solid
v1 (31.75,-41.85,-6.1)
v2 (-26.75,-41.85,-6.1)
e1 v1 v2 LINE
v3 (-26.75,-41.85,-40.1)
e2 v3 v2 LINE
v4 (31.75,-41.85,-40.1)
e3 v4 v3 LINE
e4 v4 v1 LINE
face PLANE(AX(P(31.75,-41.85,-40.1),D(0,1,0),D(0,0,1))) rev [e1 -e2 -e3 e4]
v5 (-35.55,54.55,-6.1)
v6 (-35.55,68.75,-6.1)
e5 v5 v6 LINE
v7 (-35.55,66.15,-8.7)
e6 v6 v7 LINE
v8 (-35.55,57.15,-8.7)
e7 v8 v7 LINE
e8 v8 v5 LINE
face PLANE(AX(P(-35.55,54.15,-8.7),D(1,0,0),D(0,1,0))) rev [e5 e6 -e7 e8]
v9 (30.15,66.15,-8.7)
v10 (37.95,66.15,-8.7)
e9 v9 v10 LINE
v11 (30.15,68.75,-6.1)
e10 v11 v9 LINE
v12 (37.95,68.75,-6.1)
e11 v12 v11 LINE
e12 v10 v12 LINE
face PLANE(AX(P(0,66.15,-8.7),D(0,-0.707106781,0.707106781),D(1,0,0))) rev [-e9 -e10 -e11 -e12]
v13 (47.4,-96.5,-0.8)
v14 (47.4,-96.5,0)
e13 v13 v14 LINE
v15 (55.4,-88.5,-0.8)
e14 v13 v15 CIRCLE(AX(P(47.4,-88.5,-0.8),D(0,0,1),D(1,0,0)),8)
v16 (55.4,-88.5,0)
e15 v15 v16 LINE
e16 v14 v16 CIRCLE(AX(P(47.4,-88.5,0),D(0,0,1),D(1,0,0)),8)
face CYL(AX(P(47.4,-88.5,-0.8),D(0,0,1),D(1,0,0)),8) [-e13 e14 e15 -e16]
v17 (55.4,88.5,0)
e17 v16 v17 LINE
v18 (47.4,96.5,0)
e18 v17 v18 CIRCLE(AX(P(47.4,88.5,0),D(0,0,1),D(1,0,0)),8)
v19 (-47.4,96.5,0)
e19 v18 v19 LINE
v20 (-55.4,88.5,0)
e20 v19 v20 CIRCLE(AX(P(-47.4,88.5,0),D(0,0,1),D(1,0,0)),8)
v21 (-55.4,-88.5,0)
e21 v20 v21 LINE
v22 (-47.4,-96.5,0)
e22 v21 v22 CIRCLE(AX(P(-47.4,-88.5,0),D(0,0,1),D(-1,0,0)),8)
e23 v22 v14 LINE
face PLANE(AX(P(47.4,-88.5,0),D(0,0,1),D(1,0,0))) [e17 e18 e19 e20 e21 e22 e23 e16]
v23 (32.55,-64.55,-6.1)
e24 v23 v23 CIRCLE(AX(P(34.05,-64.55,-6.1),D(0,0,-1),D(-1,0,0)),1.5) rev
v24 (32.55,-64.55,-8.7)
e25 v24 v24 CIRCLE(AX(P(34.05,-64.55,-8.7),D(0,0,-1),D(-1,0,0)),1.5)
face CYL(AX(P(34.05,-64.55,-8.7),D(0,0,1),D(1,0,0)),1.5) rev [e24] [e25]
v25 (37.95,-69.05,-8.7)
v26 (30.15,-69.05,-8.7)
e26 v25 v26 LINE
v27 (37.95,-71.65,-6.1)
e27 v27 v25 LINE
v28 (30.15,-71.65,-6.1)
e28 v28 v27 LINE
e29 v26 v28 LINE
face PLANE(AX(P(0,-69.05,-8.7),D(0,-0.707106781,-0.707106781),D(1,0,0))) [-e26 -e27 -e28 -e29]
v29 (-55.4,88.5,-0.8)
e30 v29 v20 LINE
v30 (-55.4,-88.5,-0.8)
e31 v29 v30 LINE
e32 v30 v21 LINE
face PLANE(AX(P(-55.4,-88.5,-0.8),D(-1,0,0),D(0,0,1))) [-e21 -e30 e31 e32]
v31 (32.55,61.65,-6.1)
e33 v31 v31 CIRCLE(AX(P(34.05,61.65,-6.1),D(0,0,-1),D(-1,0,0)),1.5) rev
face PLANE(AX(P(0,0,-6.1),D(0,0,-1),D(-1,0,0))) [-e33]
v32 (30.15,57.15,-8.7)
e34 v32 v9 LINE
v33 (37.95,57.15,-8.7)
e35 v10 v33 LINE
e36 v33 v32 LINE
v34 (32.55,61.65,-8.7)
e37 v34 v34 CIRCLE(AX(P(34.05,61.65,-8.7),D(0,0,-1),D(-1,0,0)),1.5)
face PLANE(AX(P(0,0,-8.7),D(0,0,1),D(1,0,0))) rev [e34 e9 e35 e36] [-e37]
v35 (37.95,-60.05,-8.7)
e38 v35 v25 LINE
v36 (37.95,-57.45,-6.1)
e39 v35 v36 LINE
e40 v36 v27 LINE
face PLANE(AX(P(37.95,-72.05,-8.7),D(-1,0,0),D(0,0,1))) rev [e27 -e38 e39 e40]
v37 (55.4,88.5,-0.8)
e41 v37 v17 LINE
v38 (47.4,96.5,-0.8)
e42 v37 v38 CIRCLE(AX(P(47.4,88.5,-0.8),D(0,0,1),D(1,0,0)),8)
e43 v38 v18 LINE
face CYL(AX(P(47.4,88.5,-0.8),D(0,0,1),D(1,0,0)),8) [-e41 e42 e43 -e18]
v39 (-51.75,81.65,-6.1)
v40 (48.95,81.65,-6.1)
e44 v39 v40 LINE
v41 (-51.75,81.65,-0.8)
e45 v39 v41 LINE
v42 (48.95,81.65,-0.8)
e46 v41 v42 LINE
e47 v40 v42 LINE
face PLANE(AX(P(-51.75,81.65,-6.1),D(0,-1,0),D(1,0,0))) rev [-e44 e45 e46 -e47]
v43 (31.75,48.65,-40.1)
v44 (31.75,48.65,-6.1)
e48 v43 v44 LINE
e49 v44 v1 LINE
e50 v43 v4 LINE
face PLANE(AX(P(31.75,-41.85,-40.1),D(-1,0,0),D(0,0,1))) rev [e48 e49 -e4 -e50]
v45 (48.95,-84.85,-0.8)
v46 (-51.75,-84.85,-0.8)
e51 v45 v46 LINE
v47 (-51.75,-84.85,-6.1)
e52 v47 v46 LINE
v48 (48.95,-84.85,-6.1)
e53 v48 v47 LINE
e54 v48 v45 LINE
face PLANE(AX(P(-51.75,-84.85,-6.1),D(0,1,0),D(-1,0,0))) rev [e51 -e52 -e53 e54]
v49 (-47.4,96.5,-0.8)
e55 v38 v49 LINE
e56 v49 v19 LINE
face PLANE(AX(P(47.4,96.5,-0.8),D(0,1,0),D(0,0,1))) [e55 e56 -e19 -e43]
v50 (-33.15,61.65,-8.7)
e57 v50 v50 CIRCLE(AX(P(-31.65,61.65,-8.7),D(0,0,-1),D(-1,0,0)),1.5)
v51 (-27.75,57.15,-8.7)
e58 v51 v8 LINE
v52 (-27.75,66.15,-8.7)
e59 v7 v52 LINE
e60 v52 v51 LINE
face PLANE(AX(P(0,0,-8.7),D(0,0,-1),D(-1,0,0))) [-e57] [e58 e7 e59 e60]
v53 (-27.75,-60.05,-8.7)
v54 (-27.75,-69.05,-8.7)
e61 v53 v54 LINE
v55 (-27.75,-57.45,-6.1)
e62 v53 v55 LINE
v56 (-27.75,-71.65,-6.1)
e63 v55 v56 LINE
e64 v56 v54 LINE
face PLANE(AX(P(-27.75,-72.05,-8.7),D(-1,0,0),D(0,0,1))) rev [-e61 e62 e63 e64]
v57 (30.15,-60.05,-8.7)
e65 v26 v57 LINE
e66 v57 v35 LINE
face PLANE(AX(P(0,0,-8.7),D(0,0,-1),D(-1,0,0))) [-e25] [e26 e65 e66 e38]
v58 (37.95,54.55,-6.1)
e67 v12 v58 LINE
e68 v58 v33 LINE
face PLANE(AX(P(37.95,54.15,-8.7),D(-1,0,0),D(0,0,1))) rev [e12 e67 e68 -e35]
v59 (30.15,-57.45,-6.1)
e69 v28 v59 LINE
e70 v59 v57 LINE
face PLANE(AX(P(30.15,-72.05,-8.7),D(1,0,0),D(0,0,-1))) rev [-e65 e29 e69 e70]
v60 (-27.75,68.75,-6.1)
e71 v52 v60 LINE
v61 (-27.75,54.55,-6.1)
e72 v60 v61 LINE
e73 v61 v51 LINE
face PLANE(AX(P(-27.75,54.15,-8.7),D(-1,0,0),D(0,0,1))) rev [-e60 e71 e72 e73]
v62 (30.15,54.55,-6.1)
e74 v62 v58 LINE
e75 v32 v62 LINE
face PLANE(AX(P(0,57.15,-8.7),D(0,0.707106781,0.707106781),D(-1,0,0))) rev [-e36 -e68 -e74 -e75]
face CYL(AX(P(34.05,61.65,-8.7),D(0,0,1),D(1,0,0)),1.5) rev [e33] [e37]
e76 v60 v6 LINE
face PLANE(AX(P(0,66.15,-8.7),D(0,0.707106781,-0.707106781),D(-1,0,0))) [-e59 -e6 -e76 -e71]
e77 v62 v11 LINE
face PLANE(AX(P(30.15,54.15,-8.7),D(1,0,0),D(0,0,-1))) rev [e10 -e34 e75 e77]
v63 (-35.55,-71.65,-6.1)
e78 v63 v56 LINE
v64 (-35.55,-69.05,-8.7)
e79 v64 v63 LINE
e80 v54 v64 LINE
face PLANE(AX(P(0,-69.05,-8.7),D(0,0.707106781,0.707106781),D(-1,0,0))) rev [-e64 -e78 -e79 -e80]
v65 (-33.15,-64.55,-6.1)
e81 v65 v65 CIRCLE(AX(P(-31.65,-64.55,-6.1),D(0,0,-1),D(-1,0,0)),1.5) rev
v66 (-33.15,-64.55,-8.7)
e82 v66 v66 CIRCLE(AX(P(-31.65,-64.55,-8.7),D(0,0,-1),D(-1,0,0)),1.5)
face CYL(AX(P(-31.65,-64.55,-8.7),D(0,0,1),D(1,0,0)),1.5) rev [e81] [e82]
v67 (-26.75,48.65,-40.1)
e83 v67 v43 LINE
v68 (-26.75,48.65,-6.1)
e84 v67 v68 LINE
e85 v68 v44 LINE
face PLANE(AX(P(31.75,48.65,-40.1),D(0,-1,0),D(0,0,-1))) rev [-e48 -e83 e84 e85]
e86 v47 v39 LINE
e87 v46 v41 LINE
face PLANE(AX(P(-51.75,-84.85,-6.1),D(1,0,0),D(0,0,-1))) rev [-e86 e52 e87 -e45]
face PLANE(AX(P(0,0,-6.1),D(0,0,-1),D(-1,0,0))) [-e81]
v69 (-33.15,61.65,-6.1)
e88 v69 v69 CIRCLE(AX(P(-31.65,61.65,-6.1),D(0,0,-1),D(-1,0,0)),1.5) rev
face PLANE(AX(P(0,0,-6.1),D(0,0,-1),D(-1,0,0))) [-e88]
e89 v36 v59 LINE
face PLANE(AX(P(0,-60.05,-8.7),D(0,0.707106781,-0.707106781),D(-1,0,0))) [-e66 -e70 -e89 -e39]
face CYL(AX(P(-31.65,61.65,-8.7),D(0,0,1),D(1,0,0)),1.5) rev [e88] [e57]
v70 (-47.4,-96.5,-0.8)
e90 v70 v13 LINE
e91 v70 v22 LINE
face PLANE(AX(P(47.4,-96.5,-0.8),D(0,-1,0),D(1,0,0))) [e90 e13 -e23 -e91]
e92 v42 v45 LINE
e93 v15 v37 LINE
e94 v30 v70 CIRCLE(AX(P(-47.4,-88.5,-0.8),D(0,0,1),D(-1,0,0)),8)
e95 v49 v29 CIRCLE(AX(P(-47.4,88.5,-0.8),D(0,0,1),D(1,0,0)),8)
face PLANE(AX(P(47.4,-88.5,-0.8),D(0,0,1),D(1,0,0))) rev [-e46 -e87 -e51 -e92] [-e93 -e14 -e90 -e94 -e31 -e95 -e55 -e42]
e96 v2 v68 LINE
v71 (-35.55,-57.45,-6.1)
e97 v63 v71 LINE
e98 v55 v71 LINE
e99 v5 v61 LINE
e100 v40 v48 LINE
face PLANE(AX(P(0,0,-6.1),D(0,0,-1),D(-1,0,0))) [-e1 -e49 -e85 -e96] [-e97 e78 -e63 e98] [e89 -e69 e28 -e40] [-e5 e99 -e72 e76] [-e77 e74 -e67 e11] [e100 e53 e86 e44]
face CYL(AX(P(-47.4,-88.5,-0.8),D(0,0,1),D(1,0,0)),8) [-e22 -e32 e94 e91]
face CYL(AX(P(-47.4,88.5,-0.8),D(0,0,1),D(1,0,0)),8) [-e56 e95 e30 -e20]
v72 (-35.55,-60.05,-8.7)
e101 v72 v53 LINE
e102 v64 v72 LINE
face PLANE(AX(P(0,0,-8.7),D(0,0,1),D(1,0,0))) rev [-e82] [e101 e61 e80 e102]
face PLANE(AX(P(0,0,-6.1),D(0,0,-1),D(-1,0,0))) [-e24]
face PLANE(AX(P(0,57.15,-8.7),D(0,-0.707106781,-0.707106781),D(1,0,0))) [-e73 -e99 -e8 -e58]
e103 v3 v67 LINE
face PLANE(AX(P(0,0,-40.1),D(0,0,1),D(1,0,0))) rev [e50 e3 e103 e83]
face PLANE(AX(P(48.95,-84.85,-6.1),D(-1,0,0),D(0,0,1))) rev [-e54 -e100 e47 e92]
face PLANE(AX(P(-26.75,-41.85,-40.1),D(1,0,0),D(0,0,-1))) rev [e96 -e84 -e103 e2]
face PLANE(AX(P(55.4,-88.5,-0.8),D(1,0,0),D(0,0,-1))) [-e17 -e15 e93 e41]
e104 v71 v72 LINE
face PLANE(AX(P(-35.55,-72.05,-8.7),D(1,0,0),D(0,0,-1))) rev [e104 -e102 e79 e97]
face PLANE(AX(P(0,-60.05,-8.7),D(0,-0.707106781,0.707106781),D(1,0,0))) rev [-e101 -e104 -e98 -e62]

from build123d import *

# Parameters (mm, degrees)
BOSS_EXTRUDE1_DEPTH = 0.8
SKETCH2_W           = 100.7
SKETCH2_H           = 166.5
BOSS_EXTRUDE2_DEPTH = 5.3
SKETCH3_W           = 7.8
SKETCH3_H           = 15
SKETCH3_R           = 1.5
BOSS_EXTRUDE3_DEPTH = 2.6
SKETCH4_W           = 58.5
SKETCH4_H           = 90.5
BOSS_EXTRUDE4_DEPTH = 34
CHAMFER1_SIZE       = 3


with BuildPart() as part:
    # Sketch1 → Boss-Extrude1 (new body)
    with BuildSketch(Plane.XY):
        with BuildLine():
            Line((47.4, -96.5), (-47.4, -96.5))
            ThreePointArc((-47.4, -96.5), (-53.056854249, -94.156854249), (-55.4, -88.5))
            Line((-55.4, -88.5), (-55.4, 88.5))
            ThreePointArc((-55.4, 88.5), (-53.056854249, 94.156854249), (-47.4, 96.5))
            Line((-47.4, 96.5), (47.4, 96.5))
            ThreePointArc((47.4, 96.5), (53.056854249, 94.156854249), (55.4, 88.5))
            Line((55.4, 88.5), (55.4, -88.5))
            ThreePointArc((55.4, -88.5), (53.056854249, -94.156854249), (47.4, -96.5))
        make_face()
    extrude(amount=-BOSS_EXTRUDE1_DEPTH)

    # Sketch2 → Boss-Extrude2 (add)
    with BuildSketch(Plane(origin=(0, 0, -0.8), x_dir=(-1, 0, 0), z_dir=(0, 0, -1))):
        with Locations((1.4, -1.6)):
            Rectangle(SKETCH2_W, SKETCH2_H)
    extrude(amount=BOSS_EXTRUDE2_DEPTH)

    # Sketch3 → Boss-Extrude3 (add)
    # profile 1 of 4: a face of its own
    with BuildSketch(Plane(origin=(0, 0, -6.1), x_dir=(-1, 0, 0), z_dir=(0, 0, -1))):
        with Locations((-34.05, 61.65)):
            Rectangle(SKETCH3_W, SKETCH3_H)
        with Locations((-34.05, 61.65)):
            Circle(SKETCH3_R, mode=Mode.SUBTRACT)
    # profile 2 of 4: a face of its own
    with BuildSketch(Plane(origin=(0, 0, -6.1), x_dir=(-1, 0, 0), z_dir=(0, 0, -1))):
        with Locations((31.65, 61.65)):
            Rectangle(SKETCH3_W, SKETCH3_H)
        with Locations((31.65, 61.65)):
            Circle(SKETCH3_R, mode=Mode.SUBTRACT)
    # profile 3 of 4: a face of its own
    with BuildSketch(Plane(origin=(0, 0, -6.1), x_dir=(-1, 0, 0), z_dir=(0, 0, -1))):
        with Locations((-34.05, -64.55)):
            Rectangle(SKETCH3_W, SKETCH3_H)
        with Locations((-34.05, -64.55)):
            Circle(SKETCH3_R, mode=Mode.SUBTRACT)
    # profile 4 of 4: a face of its own
    with BuildSketch(Plane(origin=(0, 0, -6.1), x_dir=(-1, 0, 0), z_dir=(0, 0, -1))):
        with Locations((31.65, -64.55)):
            Rectangle(SKETCH3_W, SKETCH3_H)
        with Locations((31.65, -64.55)):
            Circle(SKETCH3_R, mode=Mode.SUBTRACT)
    extrude(amount=BOSS_EXTRUDE3_DEPTH)

    # Sketch4 → Boss-Extrude4 (add)
    with BuildSketch(Plane(origin=(0, 0, -6.1), x_dir=(-1, 0, 0), z_dir=(0, 0, -1))):
        with Locations((-2.5, 3.4)):
            Rectangle(SKETCH4_W, SKETCH4_H)
    extrude(amount=BOSS_EXTRUDE4_DEPTH)

    # Chamfer1
    # the kernel refuses this chamfer: 3 mm, written as the material it takes off along each edge
    with BuildSketch(Plane(origin=(-20.034951036, -72.05, -8.7), x_dir=(0, -0.027495876610586775, 0.9996219169112968), z_dir=(-1, 0, 0))) as chamfer1_piece_1_section:
        Polygon((CHAMFER1_SIZE * 0.999621916911, CHAMFER1_SIZE * 0.0274958766106), (-CHAMFER1_SIZE * 0.0274958766106, CHAMFER1_SIZE * 0.999621916911), (0, 0), align=None)
    chamfer1_piece_1 = extrude(amount=23.230097928, mode=Mode.PRIVATE)
    chamfer1_piece_1 = split(chamfer1_piece_1, bisect_by=Plane(origin=(-31.65, -71.03377063, -6.1), z_dir=(0, 0, -1)), keep=Keep.TOP, mode=Mode.PRIVATE)
    add(chamfer1_piece_1, mode=Mode.SUBTRACT)
    with BuildSketch(Plane(origin=(-43.265048964, -57.05, -8.7), x_dir=(0, 0.027495876610586775, 0.9996219169112968), z_dir=(1, 0, 0))) as chamfer1_piece_2_section:
        Polygon((CHAMFER1_SIZE * 0.999621916911, CHAMFER1_SIZE * 0.0274958766106), (-CHAMFER1_SIZE * 0.0274958766106, CHAMFER1_SIZE * 0.999621916911), (0, 0), align=None)
    chamfer1_piece_2 = extrude(amount=23.230097928, mode=Mode.PRIVATE)
    chamfer1_piece_2 = split(chamfer1_piece_2, bisect_by=Plane(origin=(-31.65, -58.06622937, -6.1), z_dir=(0, 0, -1)), keep=Keep.TOP, mode=Mode.PRIVATE)
    add(chamfer1_piece_2, mode=Mode.SUBTRACT)
    with BuildSketch(Plane(origin=(22.434951036, -72.05, -8.7), x_dir=(0, -0.027495876610586775, 0.9996219169112968), z_dir=(1, 0, 0))) as chamfer1_piece_3_section:
        Polygon((CHAMFER1_SIZE * 0.999621916911, -CHAMFER1_SIZE * 0.0274958766106), (-CHAMFER1_SIZE * 0.0274958766106, -CHAMFER1_SIZE * 0.999621916911), (0, 0), align=None)
    chamfer1_piece_3 = extrude(amount=23.230097928, mode=Mode.PRIVATE)
    chamfer1_piece_3 = split(chamfer1_piece_3, bisect_by=Plane(origin=(34.05, -71.03377063, -6.1), z_dir=(0, 0, -1)), keep=Keep.TOP, mode=Mode.PRIVATE)
    add(chamfer1_piece_3, mode=Mode.SUBTRACT)
    with BuildSketch(Plane(origin=(45.665048964, -57.05, -8.7), x_dir=(0, 0.027495876610586775, 0.9996219169112968), z_dir=(-1, 0, 0))) as chamfer1_piece_4_section:
        Polygon((CHAMFER1_SIZE * 0.999621916911, -CHAMFER1_SIZE * 0.0274958766106), (-CHAMFER1_SIZE * 0.0274958766106, -CHAMFER1_SIZE * 0.999621916911), (0, 0), align=None)
    chamfer1_piece_4 = extrude(amount=23.230097928, mode=Mode.PRIVATE)
    chamfer1_piece_4 = split(chamfer1_piece_4, bisect_by=Plane(origin=(34.05, -58.06622937, -6.1), z_dir=(0, 0, -1)), keep=Keep.TOP, mode=Mode.PRIVATE)
    add(chamfer1_piece_4, mode=Mode.SUBTRACT)
    with BuildSketch(Plane(origin=(45.665048964, 54.15, -8.7), x_dir=(0, -0.027495876610586775, 0.9996219169112968), z_dir=(-1, 0, 0))) as chamfer1_piece_5_section:
        Polygon((CHAMFER1_SIZE * 0.999621916911, CHAMFER1_SIZE * 0.0274958766106), (-CHAMFER1_SIZE * 0.0274958766106, CHAMFER1_SIZE * 0.999621916911), (0, 0), align=None)
    chamfer1_piece_5 = extrude(amount=23.230097928, mode=Mode.PRIVATE)
    chamfer1_piece_5 = split(chamfer1_piece_5, bisect_by=Plane(origin=(34.05, 55.16622937, -6.1), z_dir=(0, 0, -1)), keep=Keep.TOP, mode=Mode.PRIVATE)
    add(chamfer1_piece_5, mode=Mode.SUBTRACT)
    with BuildSketch(Plane(origin=(22.434951036, 69.15, -8.7), x_dir=(0, 0.027495876610586775, 0.9996219169112968), z_dir=(1, 0, 0))) as chamfer1_piece_6_section:
        Polygon((CHAMFER1_SIZE * 0.999621916911, CHAMFER1_SIZE * 0.0274958766106), (-CHAMFER1_SIZE * 0.0274958766106, CHAMFER1_SIZE * 0.999621916911), (0, 0), align=None)
    chamfer1_piece_6 = extrude(amount=23.230097928, mode=Mode.PRIVATE)
    chamfer1_piece_6 = split(chamfer1_piece_6, bisect_by=Plane(origin=(34.05, 68.13377063, -6.1), z_dir=(0, 0, -1)), keep=Keep.TOP, mode=Mode.PRIVATE)
    add(chamfer1_piece_6, mode=Mode.SUBTRACT)
    with BuildSketch(Plane(origin=(-43.265048964, 54.15, -8.7), x_dir=(0, -0.027495876610586775, 0.9996219169112968), z_dir=(1, 0, 0))) as chamfer1_piece_7_section:
        Polygon((CHAMFER1_SIZE * 0.999621916911, -CHAMFER1_SIZE * 0.0274958766106), (-CHAMFER1_SIZE * 0.0274958766106, -CHAMFER1_SIZE * 0.999621916911), (0, 0), align=None)
    chamfer1_piece_7 = extrude(amount=23.230097928, mode=Mode.PRIVATE)
    chamfer1_piece_7 = split(chamfer1_piece_7, bisect_by=Plane(origin=(-31.65, 55.16622937, -6.1), z_dir=(0, 0, -1)), keep=Keep.TOP, mode=Mode.PRIVATE)
    add(chamfer1_piece_7, mode=Mode.SUBTRACT)
    with BuildSketch(Plane(origin=(-20.034951036, 69.15, -8.7), x_dir=(0, 0.027495876610586775, 0.9996219169112968), z_dir=(-1, 0, 0))) as chamfer1_piece_8_section:
        Polygon((CHAMFER1_SIZE * 0.999621916911, -CHAMFER1_SIZE * 0.0274958766106), (-CHAMFER1_SIZE * 0.0274958766106, -CHAMFER1_SIZE * 0.999621916911), (0, 0), align=None)
    chamfer1_piece_8 = extrude(amount=23.230097928, mode=Mode.PRIVATE)
    chamfer1_piece_8 = split(chamfer1_piece_8, bisect_by=Plane(origin=(-31.65, 68.13377063, -6.1), z_dir=(0, 0, -1)), keep=Keep.TOP, mode=Mode.PRIVATE)
    add(chamfer1_piece_8, mode=Mode.SUBTRACT)


solid = part.part
